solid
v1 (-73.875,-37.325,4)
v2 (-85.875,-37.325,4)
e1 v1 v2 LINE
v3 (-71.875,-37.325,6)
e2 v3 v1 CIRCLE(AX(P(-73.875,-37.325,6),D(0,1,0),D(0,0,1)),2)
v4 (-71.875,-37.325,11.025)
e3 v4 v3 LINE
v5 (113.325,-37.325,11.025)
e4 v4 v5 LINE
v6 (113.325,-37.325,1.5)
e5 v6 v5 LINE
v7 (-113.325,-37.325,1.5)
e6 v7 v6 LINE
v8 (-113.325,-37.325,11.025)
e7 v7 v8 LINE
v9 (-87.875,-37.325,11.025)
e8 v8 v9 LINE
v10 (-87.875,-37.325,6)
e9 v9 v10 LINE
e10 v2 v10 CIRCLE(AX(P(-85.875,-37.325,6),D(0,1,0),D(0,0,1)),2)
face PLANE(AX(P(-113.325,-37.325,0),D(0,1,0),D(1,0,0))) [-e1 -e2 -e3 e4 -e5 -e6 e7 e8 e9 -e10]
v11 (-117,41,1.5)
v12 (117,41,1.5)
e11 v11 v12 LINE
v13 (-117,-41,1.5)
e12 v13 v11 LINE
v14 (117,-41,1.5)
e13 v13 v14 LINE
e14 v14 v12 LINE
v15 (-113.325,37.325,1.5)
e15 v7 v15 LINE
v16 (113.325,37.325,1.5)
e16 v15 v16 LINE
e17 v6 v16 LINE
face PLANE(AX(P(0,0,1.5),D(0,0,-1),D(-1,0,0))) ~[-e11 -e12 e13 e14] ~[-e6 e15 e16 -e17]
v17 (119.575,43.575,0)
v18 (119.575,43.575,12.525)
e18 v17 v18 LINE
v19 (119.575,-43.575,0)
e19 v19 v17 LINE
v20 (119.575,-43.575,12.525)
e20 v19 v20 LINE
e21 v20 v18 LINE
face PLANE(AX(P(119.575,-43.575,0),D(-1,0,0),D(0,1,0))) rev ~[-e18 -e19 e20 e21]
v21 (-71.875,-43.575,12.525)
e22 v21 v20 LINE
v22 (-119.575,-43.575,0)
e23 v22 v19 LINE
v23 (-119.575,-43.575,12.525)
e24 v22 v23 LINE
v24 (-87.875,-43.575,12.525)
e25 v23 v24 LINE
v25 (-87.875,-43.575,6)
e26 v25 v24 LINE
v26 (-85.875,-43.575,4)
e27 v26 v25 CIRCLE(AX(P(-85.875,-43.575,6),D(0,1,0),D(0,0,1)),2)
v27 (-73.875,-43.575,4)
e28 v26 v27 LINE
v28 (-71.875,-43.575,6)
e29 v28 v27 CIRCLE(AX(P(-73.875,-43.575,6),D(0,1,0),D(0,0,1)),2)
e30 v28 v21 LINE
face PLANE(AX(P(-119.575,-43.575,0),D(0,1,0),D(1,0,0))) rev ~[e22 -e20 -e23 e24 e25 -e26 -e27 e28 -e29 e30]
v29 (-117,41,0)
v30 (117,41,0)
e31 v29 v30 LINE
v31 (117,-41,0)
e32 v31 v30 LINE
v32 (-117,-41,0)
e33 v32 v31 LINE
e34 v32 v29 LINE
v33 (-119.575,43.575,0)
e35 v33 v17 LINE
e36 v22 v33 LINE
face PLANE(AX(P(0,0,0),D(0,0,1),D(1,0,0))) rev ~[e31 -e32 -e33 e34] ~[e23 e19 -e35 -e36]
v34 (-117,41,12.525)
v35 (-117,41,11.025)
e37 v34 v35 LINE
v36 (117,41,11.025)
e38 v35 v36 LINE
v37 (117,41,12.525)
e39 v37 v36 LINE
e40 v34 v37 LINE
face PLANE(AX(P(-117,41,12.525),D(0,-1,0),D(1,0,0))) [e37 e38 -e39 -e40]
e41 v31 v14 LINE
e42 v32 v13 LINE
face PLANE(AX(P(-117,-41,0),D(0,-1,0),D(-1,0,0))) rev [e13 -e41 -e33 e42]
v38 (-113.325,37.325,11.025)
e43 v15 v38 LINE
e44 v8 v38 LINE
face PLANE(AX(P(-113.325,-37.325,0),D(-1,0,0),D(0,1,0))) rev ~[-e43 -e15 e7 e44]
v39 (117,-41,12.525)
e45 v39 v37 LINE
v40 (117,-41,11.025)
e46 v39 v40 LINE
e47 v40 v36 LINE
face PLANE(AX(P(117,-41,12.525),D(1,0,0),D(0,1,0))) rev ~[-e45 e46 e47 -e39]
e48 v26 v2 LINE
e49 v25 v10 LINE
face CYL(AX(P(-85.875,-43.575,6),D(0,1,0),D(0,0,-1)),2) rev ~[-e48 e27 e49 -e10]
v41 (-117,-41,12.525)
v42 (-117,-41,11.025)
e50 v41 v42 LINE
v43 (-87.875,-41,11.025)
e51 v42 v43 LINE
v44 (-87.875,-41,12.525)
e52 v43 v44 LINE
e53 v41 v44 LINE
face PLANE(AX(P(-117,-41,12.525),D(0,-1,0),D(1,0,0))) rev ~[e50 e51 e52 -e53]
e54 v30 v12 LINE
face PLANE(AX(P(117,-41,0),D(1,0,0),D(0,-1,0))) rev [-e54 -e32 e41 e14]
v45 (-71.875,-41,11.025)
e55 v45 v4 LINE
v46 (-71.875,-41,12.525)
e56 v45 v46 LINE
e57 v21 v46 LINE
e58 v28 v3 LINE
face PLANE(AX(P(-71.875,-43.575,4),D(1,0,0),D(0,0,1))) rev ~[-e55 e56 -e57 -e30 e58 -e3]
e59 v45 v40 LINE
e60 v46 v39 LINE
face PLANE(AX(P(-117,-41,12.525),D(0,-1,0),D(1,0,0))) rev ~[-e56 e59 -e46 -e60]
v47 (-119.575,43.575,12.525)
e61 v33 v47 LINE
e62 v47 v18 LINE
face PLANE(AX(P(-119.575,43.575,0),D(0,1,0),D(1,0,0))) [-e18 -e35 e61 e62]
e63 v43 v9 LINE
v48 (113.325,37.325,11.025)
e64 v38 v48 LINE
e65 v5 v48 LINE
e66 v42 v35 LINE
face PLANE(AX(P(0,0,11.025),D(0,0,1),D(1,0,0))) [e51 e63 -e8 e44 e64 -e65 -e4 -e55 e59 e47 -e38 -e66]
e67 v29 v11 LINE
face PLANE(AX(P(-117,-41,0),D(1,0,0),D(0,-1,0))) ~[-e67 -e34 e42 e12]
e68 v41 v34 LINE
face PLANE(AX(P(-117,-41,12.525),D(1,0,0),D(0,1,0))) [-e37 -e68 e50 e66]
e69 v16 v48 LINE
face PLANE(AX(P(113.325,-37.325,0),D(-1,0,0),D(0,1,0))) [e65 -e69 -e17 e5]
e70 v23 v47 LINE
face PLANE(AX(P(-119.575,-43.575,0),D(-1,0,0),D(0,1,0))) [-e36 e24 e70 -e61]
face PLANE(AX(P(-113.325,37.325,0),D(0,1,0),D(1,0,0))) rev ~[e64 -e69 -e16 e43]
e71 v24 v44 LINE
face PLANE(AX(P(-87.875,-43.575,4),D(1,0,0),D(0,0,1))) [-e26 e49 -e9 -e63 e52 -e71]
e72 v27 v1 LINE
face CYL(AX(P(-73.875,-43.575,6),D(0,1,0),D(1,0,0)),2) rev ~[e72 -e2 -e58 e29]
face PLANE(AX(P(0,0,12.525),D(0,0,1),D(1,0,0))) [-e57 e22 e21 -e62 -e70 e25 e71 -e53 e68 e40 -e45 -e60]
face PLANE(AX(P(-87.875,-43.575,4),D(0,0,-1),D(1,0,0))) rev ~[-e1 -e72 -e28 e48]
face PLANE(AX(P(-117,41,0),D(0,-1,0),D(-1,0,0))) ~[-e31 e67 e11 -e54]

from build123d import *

# Parameters (mm, degrees)
F0_W     = 239.15
F0_H     = 87.15
F0_W_2   = 234
F0_H_2   = 82
F0_W_3   = 233
F0_H_3   = 81
F0_W_4   = 226.65
F0_H_4   = 74.65
F1_DEPTH = 12.525
F2_W     = 234
F2_H     = 82
F2_W_2   = 233
F2_H_2   = 81
F2_W_3   = 226.65
F2_H_3   = 74.65
F3_DEPTH = 1.5
F4_W     = 234
F4_H     = 82
F4_W_2   = 233
F4_H_2   = 81
F4_W_3   = 226.65
F4_H_3   = 74.65
F5_DEPTH = 1.5
F6_W     = 16
F6_H     = 9
F7_DEPTH = 10
F8_R     = 2


# Not quite as in the source:
# - a pattern or mirror of a feature is missing from the dataset's text; its kind, count and spacing are read off the source's solid


with BuildPart() as f1:
    # F0 (on Top) → F1 (new body)
    with BuildSketch(Plane.XY):
        Rectangle(F0_W, F0_H)
        Rectangle(F0_W_2, F0_H_2, mode=Mode.SUBTRACT)
        Rectangle(F0_W_2, F0_H_2)
        Rectangle(F0_W_3, F0_H_3, mode=Mode.SUBTRACT)
        Rectangle(F0_W_3, F0_H_3)
        Rectangle(F0_W_4, F0_H_4, mode=Mode.SUBTRACT)
    extrude(amount=F1_DEPTH)

    # F2 (on face) → F3 (cut)
    with BuildSketch(Plane.XY.offset(12.525)):
        Rectangle(F2_W, F2_H)
        Rectangle(F2_W_2, F2_H_2, mode=Mode.SUBTRACT)
        Rectangle(F2_W_2, F2_H_2)
        Rectangle(F2_W_3, F2_H_3, mode=Mode.SUBTRACT)
    f3 = extrude(amount=-F3_DEPTH, mode=Mode.SUBTRACT)

    # F3_copies: F3 across plane
    add(f3.mirror(Plane(origin=(0, 0, 6.2625), x_dir=(-1, 0, 0), z_dir=(0, 0, -1))), mode=Mode.SUBTRACT)

    # F4 (on face) → F5 (cut)
    with BuildSketch(Plane.XY):
        Rectangle(F4_W, F4_H)
        Rectangle(F4_W_2, F4_H_2, mode=Mode.SUBTRACT)
        Rectangle(F4_W_2, F4_H_2)
        Rectangle(F4_W_3, F4_H_3, mode=Mode.SUBTRACT)
    extrude(amount=-F5_DEPTH, mode=Mode.SUBTRACT)

    # F6 (on face) → F7 (cut)
    with BuildSketch(Plane.XZ.offset(43.575)):
        with Locations((-79.875, 8.5)):
            Rectangle(F6_W, F6_H)
    extrude(amount=-F7_DEPTH, mode=Mode.SUBTRACT)

    # F8
    f8_edges = [f1.edges().sort_by_distance(p)[0] for p in [
        (-71.875, -40.45, 4),
        (-87.875, -40.45, 4),
    ]]
    fillet(f8_edges, radius=F8_R)


solid = f1.part
